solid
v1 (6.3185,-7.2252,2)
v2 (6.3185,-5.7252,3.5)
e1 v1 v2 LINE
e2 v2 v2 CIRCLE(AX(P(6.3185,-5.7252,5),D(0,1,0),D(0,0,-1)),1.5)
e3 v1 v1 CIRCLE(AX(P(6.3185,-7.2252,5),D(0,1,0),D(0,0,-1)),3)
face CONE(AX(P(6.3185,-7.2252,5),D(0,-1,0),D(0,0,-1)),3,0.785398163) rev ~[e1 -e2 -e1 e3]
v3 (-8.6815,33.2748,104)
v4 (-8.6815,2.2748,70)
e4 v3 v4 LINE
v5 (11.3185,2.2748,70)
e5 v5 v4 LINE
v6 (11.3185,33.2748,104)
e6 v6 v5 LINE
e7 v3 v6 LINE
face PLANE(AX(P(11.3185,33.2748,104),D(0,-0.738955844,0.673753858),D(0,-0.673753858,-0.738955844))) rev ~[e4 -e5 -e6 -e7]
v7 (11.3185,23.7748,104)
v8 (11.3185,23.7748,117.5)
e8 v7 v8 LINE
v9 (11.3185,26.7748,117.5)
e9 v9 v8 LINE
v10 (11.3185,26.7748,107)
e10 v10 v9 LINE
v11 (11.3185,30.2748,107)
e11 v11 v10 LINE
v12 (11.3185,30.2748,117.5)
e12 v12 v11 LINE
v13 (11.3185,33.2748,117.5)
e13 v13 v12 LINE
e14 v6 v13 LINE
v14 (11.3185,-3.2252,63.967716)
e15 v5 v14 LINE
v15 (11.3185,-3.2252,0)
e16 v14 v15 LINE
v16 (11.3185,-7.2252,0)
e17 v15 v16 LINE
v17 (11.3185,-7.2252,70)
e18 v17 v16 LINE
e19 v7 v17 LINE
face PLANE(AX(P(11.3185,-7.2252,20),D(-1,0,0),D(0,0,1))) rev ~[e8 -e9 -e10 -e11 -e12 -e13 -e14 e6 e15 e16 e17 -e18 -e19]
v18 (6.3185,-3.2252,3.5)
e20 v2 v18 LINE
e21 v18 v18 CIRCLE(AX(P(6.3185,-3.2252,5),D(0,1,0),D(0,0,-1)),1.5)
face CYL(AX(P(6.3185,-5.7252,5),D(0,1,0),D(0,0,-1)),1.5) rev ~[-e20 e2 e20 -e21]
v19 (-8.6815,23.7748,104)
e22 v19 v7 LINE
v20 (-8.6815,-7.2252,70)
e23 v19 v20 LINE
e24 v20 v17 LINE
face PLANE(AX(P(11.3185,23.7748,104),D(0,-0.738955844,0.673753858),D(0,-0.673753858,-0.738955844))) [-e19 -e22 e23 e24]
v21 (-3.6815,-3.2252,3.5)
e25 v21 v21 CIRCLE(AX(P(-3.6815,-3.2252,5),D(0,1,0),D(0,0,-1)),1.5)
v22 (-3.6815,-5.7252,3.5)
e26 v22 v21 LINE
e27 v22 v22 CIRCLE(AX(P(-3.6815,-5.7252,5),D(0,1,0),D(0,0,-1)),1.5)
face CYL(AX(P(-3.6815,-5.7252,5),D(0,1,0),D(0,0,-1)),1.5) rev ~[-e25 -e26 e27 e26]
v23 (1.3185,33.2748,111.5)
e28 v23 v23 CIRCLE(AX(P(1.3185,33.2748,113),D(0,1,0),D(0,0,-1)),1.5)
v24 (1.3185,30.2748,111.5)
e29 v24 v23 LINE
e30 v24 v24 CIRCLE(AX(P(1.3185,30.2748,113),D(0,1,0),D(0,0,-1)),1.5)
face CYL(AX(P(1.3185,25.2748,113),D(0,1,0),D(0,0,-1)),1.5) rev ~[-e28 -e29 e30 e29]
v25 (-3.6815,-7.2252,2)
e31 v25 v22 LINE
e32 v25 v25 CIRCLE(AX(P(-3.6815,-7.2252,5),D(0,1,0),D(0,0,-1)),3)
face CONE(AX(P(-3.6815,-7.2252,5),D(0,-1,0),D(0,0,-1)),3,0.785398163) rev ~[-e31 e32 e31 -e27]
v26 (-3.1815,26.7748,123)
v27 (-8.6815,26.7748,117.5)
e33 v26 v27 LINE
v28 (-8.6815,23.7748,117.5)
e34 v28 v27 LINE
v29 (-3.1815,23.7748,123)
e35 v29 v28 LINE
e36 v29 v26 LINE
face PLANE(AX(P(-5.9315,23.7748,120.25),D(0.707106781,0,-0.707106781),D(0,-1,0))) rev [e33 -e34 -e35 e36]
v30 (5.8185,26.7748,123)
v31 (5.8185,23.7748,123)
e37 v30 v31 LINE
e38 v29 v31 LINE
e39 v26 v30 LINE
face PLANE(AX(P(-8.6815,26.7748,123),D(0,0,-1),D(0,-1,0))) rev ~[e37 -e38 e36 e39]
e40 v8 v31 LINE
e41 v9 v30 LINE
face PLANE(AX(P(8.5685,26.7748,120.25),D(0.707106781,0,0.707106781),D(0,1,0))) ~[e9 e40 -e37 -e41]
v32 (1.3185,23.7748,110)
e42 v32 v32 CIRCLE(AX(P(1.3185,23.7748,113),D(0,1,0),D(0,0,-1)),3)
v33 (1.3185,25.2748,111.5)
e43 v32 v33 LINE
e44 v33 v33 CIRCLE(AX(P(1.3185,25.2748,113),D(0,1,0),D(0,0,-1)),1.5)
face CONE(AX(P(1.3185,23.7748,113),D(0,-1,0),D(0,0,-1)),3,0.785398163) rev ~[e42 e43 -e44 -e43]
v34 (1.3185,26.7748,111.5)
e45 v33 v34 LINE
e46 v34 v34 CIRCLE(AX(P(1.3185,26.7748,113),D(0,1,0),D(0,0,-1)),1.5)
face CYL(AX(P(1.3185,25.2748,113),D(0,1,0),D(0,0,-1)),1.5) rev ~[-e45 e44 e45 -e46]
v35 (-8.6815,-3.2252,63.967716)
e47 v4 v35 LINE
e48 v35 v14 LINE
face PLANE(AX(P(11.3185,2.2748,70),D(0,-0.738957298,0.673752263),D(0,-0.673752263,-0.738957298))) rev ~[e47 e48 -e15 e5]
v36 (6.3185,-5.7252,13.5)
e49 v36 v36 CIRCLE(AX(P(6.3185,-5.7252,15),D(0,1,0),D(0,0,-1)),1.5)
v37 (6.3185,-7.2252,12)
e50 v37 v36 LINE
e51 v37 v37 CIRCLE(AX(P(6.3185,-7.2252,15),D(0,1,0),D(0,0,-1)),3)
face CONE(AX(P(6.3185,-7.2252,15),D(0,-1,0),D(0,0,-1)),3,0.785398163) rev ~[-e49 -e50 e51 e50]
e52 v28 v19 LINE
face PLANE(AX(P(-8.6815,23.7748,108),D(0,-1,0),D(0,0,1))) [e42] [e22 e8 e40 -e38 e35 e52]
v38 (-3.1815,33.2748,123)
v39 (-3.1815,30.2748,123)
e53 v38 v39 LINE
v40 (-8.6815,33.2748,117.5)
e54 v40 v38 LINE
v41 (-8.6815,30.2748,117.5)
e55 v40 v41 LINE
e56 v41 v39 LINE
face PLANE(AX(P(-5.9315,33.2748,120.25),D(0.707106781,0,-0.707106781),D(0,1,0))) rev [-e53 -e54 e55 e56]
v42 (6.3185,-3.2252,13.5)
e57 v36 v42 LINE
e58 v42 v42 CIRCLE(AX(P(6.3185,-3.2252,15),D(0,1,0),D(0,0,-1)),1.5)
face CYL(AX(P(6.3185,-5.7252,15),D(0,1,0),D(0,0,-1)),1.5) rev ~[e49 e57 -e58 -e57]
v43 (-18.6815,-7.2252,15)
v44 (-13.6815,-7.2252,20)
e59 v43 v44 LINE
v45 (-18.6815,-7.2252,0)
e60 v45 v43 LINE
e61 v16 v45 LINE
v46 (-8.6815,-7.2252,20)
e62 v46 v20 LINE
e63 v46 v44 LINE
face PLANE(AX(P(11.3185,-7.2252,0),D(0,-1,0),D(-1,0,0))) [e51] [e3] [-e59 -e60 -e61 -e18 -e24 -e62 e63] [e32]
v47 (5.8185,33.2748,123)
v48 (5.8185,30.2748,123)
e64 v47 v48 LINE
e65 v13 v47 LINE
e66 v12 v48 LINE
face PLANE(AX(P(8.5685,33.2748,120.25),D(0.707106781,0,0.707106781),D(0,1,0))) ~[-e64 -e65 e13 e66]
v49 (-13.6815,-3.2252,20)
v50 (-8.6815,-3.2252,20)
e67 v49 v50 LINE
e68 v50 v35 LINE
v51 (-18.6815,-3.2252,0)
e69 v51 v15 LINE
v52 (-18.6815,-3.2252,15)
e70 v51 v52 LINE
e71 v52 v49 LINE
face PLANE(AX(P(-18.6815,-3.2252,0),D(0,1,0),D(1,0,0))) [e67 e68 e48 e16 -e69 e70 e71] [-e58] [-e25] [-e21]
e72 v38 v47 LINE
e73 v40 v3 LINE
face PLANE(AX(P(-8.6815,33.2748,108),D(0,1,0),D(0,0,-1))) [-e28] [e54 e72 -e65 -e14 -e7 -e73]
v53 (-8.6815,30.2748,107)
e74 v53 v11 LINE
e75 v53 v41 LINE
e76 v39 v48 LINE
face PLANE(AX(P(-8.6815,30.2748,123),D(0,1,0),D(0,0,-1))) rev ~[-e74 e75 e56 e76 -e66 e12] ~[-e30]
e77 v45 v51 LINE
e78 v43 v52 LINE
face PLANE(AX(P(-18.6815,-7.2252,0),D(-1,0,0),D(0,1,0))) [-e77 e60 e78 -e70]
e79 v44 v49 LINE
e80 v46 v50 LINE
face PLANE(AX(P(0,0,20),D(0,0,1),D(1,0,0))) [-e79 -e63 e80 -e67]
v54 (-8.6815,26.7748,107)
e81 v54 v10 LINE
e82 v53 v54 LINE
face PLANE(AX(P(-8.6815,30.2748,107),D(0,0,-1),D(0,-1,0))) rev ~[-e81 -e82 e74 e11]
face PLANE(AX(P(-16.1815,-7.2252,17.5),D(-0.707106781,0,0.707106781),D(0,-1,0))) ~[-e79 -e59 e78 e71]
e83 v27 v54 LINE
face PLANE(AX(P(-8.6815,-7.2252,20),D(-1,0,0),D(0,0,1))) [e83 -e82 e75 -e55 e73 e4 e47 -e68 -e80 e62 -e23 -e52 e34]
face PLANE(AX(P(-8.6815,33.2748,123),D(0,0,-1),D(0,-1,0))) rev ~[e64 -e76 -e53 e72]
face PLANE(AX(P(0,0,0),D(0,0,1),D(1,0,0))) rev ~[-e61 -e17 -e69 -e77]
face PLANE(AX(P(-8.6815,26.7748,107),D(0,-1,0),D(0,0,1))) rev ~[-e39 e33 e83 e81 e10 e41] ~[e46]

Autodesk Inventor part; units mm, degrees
ref_plane "YZ Plane" through (0, 0, 0) normal (1, 0, 0) x (0, 1, 0)
ref_plane "XZ Plane" through (0, 0, 0) normal (0, 1, 0) x (-1, 0, 0)
ref_plane "XY Plane" through (0, 0, 0) normal (0, 0, 1) x (1, 0, 0)
sketch "Sketch1" plane through (0, 0, 0) normal (0, 0, 1) x (1, 0, 0)
  line L0 (-18.6815, -3.2252) -> (11.3185, -3.2252)
  line L1 (11.3185, -3.2252) -> (11.3185, -7.2252)
  line L2 (11.3185, -7.2252) -> (-18.6815, -7.2252)
  line L3 (-18.6815, -7.2252) -> (-18.6815, -3.2252)
  point P0 (0, 0)
  dimension "d0" = 30
  dimension "d1" = 4
extrude "Extrusion1" add sketch "Sketch1" along normal blind 20
sketch "Sketch2" plane through (-18.6815, -7.2252, 0) normal (0, -1, 0) x (1, 0, 0)
  line L0 (30, 20) -> (10, 20)
  line L1 (10, 20) -> (10, 123)
  line L2 (10, 123) -> (30, 123)
  line L3 (30, 123) -> (30, 20)
  point P0 (18.6815, 0)
  dimension "d4" = 103
  dimension "d5" = 20
extrude "Extrusion2" add sketch "Sketch2" against normal blind 10
sketch "Sketch3" plane through (-18.6815, -7.2252, 0) normal (0, -1, 0) x (1, 0, 0)
  line L0 (30, 20) -> (10, 20) projected
  line L1 (30, 0) -> (30, 20) projected
  line L2 (30, 0) -> (0, 0) projected
  point P0 (18.6815, 0)
  point P1 (25, 15)
  point P2 (25, 5)
  point P3 (15, 5)
  dimension "d8" = 5
  dimension "d9" = 5
  dimension "d10" = 5
  dimension "d11" = 5
  dimension "d12" = 5
  dimension "d13" = 10
hole "Hole1" at (6.3185, -7.2252, 15) at (6.3185, -7.2252, 5) at (-3.6815, -7.2252, 5) direction (0, 1, 0) diameter 3 depth 8 tip angle 118 countersink diameter 6 countersink angle 90
chamfer "Chamfer1" distance 5 angle 45 1 edges at (-18.6815, -5.2252, 20)
sketch "Sketch4" plane through (-8.6815, -7.2252, 20) normal (-1, 0, 0) x (0, 0, 1)
  line L0 (103, 10) -> (0, 10)
  line L1 (0, 10) -> (0, 4)
  line L2 (0, 4) -> (103, 4)
  line L3 (103, 4) -> (103, 10)
  point P0 (-20, 7.2252)
extrude "Extrusion3" cut sketch "Sketch4" against normal blind 20
sketch "Sketch5" plane through (-8.6815, -7.2252, 20) normal (-1, 0, 0) x (0, 0, 1)
  line L0 (103, 4) -> (99, 4)
  line L1 (99, 4) -> (99, 34)
  line L2 (99, 34) -> (103, 34)
  line L3 (103, 34) -> (103, 4)
  point P0 (-20, 7.2252)
  dimension "d26" = 4
  dimension "d27" = 30
extrude "Extrusion4" add sketch "Sketch5" against normal blind 20
sketch "Sketch6" plane through (-8.6815, -7.2252, 20) normal (-1, 0, 0) x (0, 0, 1)
  line L0 (103, 34) -> (88, 34)
  line L1 (88, 34) -> (88, 31)
  line L2 (88, 31) -> (103, 31)
  line L3 (103, 31) -> (103, 34)
  line L4 (103, 37.5) -> (88, 37.5)
  line L5 (88, 37.5) -> (88, 40.5)
  line L6 (88, 40.5) -> (103, 40.5)
  line L7 (103, 40.5) -> (103, 37.5)
  line L8 (103, 0) -> (103, 34) projected
  line L9 (88, 40.5) -> (84, 40.5)
  line L10 (84, 40.5) -> (84, 31)
  line L11 (84, 31) -> (88, 31)
  line L12 (88, 31) -> (88, 40.5)
  point P0 (-20, 7.2252)
  dimension "d30" = 15
  dimension "d31" = 3
  dimension "d32" = 3.5
  dimension "d33" = 3
  dimension "d34" = 4
extrude "Extrusion5" add sketch "Sketch6" against normal blind 20
sketch "Sketch7" plane through (-8.6815, -7.2252, 20) normal (-1, 0, 0) x (0, 0, 1)
  line L0 (88, 37.5) -> (87, 37.5)
  line L1 (87, 37.5) -> (87, 34)
  line L2 (87, 34) -> (88, 34)
  line L3 (88, 34) -> (88, 37.5)
  line L4 (103, 34) -> (88, 34) projected
  point P0 (-20, 7.2252)
  dimension "d37" = 1
extrude "Extrusion6" cut sketch "Sketch7" against normal blind 20
sketch "Sketch8" plane through (-8.6815, -7.2252, 20) normal (-1, 0, 0) x (0, 0, 1)
  line L0 (103, 34) -> (103, 0) projected
  line L1 (-20, 0) -> (103, 0) projected
  line L2 (103, 31) -> (50, 31)
  line L3 (50, 31) -> (50, 0)
  line L4 (50, 0) -> (103, 0)
  line L5 (103, 0) -> (103, 31)
  line L6 (84, 31) -> (99, 31) projected
  line L7 (0, 0) -> (0, 4) projected
  point P0 (-20, 7.2252)
  dimension "d40" = 50
extrude "Extrusion7" cut sketch "Sketch8" against normal blind 20
sketch "Sketch9" plane through (11.3185, -7.2252, 0) normal (1, 0, 0) x (0, 0, -1)
  line L0 (-104, 40.5) -> (-104, 31)
  line L1 (-104, 31) -> (-104, 40.5) projected
  line L2 (-104, 31) -> (-70, 0)
  line L3 (-104, 40.5) -> (-70, 9.5)
  line L4 (-70, 9.5) -> (-70, 0)
  line L5 (-70, 4) -> (-70, 0) projected
  line L6 (-70, 9.5) -> (-59.5806, 0)
  line L7 (-59.5806, 0) -> (-70, 0)
  line L8 (0, 0) -> (-70, 0) projected
  point P0 (0, 7.2252)
extrude "Extrusion8" add sketch "Sketch9" against normal blind 20
sketch "Sketch10" plane through (-8.6815, 23.7748, 123) normal (0, -1, 0) x (1, 0, 0)
  line L0 (0, -16) -> (20, -16) projected
  point P0 (8.6815, -123)
  point P1 (10, -10)
  dimension "d45" = 6
hole "Hole2" at (1.3185, 23.7748, 113) direction (0, 1, 0) diameter 3 depth 15 tip angle 118 countersink diameter 6 countersink angle 90
chamfer "Chamfer2" distance 5.5 angle 45 4 edges at (11.3185, 31.7748, 123) (-8.6815, 31.7748, 123) (11.3185, 25.2748, 123) (-8.6815, 25.2748, 123)
properties part number "col support base"
